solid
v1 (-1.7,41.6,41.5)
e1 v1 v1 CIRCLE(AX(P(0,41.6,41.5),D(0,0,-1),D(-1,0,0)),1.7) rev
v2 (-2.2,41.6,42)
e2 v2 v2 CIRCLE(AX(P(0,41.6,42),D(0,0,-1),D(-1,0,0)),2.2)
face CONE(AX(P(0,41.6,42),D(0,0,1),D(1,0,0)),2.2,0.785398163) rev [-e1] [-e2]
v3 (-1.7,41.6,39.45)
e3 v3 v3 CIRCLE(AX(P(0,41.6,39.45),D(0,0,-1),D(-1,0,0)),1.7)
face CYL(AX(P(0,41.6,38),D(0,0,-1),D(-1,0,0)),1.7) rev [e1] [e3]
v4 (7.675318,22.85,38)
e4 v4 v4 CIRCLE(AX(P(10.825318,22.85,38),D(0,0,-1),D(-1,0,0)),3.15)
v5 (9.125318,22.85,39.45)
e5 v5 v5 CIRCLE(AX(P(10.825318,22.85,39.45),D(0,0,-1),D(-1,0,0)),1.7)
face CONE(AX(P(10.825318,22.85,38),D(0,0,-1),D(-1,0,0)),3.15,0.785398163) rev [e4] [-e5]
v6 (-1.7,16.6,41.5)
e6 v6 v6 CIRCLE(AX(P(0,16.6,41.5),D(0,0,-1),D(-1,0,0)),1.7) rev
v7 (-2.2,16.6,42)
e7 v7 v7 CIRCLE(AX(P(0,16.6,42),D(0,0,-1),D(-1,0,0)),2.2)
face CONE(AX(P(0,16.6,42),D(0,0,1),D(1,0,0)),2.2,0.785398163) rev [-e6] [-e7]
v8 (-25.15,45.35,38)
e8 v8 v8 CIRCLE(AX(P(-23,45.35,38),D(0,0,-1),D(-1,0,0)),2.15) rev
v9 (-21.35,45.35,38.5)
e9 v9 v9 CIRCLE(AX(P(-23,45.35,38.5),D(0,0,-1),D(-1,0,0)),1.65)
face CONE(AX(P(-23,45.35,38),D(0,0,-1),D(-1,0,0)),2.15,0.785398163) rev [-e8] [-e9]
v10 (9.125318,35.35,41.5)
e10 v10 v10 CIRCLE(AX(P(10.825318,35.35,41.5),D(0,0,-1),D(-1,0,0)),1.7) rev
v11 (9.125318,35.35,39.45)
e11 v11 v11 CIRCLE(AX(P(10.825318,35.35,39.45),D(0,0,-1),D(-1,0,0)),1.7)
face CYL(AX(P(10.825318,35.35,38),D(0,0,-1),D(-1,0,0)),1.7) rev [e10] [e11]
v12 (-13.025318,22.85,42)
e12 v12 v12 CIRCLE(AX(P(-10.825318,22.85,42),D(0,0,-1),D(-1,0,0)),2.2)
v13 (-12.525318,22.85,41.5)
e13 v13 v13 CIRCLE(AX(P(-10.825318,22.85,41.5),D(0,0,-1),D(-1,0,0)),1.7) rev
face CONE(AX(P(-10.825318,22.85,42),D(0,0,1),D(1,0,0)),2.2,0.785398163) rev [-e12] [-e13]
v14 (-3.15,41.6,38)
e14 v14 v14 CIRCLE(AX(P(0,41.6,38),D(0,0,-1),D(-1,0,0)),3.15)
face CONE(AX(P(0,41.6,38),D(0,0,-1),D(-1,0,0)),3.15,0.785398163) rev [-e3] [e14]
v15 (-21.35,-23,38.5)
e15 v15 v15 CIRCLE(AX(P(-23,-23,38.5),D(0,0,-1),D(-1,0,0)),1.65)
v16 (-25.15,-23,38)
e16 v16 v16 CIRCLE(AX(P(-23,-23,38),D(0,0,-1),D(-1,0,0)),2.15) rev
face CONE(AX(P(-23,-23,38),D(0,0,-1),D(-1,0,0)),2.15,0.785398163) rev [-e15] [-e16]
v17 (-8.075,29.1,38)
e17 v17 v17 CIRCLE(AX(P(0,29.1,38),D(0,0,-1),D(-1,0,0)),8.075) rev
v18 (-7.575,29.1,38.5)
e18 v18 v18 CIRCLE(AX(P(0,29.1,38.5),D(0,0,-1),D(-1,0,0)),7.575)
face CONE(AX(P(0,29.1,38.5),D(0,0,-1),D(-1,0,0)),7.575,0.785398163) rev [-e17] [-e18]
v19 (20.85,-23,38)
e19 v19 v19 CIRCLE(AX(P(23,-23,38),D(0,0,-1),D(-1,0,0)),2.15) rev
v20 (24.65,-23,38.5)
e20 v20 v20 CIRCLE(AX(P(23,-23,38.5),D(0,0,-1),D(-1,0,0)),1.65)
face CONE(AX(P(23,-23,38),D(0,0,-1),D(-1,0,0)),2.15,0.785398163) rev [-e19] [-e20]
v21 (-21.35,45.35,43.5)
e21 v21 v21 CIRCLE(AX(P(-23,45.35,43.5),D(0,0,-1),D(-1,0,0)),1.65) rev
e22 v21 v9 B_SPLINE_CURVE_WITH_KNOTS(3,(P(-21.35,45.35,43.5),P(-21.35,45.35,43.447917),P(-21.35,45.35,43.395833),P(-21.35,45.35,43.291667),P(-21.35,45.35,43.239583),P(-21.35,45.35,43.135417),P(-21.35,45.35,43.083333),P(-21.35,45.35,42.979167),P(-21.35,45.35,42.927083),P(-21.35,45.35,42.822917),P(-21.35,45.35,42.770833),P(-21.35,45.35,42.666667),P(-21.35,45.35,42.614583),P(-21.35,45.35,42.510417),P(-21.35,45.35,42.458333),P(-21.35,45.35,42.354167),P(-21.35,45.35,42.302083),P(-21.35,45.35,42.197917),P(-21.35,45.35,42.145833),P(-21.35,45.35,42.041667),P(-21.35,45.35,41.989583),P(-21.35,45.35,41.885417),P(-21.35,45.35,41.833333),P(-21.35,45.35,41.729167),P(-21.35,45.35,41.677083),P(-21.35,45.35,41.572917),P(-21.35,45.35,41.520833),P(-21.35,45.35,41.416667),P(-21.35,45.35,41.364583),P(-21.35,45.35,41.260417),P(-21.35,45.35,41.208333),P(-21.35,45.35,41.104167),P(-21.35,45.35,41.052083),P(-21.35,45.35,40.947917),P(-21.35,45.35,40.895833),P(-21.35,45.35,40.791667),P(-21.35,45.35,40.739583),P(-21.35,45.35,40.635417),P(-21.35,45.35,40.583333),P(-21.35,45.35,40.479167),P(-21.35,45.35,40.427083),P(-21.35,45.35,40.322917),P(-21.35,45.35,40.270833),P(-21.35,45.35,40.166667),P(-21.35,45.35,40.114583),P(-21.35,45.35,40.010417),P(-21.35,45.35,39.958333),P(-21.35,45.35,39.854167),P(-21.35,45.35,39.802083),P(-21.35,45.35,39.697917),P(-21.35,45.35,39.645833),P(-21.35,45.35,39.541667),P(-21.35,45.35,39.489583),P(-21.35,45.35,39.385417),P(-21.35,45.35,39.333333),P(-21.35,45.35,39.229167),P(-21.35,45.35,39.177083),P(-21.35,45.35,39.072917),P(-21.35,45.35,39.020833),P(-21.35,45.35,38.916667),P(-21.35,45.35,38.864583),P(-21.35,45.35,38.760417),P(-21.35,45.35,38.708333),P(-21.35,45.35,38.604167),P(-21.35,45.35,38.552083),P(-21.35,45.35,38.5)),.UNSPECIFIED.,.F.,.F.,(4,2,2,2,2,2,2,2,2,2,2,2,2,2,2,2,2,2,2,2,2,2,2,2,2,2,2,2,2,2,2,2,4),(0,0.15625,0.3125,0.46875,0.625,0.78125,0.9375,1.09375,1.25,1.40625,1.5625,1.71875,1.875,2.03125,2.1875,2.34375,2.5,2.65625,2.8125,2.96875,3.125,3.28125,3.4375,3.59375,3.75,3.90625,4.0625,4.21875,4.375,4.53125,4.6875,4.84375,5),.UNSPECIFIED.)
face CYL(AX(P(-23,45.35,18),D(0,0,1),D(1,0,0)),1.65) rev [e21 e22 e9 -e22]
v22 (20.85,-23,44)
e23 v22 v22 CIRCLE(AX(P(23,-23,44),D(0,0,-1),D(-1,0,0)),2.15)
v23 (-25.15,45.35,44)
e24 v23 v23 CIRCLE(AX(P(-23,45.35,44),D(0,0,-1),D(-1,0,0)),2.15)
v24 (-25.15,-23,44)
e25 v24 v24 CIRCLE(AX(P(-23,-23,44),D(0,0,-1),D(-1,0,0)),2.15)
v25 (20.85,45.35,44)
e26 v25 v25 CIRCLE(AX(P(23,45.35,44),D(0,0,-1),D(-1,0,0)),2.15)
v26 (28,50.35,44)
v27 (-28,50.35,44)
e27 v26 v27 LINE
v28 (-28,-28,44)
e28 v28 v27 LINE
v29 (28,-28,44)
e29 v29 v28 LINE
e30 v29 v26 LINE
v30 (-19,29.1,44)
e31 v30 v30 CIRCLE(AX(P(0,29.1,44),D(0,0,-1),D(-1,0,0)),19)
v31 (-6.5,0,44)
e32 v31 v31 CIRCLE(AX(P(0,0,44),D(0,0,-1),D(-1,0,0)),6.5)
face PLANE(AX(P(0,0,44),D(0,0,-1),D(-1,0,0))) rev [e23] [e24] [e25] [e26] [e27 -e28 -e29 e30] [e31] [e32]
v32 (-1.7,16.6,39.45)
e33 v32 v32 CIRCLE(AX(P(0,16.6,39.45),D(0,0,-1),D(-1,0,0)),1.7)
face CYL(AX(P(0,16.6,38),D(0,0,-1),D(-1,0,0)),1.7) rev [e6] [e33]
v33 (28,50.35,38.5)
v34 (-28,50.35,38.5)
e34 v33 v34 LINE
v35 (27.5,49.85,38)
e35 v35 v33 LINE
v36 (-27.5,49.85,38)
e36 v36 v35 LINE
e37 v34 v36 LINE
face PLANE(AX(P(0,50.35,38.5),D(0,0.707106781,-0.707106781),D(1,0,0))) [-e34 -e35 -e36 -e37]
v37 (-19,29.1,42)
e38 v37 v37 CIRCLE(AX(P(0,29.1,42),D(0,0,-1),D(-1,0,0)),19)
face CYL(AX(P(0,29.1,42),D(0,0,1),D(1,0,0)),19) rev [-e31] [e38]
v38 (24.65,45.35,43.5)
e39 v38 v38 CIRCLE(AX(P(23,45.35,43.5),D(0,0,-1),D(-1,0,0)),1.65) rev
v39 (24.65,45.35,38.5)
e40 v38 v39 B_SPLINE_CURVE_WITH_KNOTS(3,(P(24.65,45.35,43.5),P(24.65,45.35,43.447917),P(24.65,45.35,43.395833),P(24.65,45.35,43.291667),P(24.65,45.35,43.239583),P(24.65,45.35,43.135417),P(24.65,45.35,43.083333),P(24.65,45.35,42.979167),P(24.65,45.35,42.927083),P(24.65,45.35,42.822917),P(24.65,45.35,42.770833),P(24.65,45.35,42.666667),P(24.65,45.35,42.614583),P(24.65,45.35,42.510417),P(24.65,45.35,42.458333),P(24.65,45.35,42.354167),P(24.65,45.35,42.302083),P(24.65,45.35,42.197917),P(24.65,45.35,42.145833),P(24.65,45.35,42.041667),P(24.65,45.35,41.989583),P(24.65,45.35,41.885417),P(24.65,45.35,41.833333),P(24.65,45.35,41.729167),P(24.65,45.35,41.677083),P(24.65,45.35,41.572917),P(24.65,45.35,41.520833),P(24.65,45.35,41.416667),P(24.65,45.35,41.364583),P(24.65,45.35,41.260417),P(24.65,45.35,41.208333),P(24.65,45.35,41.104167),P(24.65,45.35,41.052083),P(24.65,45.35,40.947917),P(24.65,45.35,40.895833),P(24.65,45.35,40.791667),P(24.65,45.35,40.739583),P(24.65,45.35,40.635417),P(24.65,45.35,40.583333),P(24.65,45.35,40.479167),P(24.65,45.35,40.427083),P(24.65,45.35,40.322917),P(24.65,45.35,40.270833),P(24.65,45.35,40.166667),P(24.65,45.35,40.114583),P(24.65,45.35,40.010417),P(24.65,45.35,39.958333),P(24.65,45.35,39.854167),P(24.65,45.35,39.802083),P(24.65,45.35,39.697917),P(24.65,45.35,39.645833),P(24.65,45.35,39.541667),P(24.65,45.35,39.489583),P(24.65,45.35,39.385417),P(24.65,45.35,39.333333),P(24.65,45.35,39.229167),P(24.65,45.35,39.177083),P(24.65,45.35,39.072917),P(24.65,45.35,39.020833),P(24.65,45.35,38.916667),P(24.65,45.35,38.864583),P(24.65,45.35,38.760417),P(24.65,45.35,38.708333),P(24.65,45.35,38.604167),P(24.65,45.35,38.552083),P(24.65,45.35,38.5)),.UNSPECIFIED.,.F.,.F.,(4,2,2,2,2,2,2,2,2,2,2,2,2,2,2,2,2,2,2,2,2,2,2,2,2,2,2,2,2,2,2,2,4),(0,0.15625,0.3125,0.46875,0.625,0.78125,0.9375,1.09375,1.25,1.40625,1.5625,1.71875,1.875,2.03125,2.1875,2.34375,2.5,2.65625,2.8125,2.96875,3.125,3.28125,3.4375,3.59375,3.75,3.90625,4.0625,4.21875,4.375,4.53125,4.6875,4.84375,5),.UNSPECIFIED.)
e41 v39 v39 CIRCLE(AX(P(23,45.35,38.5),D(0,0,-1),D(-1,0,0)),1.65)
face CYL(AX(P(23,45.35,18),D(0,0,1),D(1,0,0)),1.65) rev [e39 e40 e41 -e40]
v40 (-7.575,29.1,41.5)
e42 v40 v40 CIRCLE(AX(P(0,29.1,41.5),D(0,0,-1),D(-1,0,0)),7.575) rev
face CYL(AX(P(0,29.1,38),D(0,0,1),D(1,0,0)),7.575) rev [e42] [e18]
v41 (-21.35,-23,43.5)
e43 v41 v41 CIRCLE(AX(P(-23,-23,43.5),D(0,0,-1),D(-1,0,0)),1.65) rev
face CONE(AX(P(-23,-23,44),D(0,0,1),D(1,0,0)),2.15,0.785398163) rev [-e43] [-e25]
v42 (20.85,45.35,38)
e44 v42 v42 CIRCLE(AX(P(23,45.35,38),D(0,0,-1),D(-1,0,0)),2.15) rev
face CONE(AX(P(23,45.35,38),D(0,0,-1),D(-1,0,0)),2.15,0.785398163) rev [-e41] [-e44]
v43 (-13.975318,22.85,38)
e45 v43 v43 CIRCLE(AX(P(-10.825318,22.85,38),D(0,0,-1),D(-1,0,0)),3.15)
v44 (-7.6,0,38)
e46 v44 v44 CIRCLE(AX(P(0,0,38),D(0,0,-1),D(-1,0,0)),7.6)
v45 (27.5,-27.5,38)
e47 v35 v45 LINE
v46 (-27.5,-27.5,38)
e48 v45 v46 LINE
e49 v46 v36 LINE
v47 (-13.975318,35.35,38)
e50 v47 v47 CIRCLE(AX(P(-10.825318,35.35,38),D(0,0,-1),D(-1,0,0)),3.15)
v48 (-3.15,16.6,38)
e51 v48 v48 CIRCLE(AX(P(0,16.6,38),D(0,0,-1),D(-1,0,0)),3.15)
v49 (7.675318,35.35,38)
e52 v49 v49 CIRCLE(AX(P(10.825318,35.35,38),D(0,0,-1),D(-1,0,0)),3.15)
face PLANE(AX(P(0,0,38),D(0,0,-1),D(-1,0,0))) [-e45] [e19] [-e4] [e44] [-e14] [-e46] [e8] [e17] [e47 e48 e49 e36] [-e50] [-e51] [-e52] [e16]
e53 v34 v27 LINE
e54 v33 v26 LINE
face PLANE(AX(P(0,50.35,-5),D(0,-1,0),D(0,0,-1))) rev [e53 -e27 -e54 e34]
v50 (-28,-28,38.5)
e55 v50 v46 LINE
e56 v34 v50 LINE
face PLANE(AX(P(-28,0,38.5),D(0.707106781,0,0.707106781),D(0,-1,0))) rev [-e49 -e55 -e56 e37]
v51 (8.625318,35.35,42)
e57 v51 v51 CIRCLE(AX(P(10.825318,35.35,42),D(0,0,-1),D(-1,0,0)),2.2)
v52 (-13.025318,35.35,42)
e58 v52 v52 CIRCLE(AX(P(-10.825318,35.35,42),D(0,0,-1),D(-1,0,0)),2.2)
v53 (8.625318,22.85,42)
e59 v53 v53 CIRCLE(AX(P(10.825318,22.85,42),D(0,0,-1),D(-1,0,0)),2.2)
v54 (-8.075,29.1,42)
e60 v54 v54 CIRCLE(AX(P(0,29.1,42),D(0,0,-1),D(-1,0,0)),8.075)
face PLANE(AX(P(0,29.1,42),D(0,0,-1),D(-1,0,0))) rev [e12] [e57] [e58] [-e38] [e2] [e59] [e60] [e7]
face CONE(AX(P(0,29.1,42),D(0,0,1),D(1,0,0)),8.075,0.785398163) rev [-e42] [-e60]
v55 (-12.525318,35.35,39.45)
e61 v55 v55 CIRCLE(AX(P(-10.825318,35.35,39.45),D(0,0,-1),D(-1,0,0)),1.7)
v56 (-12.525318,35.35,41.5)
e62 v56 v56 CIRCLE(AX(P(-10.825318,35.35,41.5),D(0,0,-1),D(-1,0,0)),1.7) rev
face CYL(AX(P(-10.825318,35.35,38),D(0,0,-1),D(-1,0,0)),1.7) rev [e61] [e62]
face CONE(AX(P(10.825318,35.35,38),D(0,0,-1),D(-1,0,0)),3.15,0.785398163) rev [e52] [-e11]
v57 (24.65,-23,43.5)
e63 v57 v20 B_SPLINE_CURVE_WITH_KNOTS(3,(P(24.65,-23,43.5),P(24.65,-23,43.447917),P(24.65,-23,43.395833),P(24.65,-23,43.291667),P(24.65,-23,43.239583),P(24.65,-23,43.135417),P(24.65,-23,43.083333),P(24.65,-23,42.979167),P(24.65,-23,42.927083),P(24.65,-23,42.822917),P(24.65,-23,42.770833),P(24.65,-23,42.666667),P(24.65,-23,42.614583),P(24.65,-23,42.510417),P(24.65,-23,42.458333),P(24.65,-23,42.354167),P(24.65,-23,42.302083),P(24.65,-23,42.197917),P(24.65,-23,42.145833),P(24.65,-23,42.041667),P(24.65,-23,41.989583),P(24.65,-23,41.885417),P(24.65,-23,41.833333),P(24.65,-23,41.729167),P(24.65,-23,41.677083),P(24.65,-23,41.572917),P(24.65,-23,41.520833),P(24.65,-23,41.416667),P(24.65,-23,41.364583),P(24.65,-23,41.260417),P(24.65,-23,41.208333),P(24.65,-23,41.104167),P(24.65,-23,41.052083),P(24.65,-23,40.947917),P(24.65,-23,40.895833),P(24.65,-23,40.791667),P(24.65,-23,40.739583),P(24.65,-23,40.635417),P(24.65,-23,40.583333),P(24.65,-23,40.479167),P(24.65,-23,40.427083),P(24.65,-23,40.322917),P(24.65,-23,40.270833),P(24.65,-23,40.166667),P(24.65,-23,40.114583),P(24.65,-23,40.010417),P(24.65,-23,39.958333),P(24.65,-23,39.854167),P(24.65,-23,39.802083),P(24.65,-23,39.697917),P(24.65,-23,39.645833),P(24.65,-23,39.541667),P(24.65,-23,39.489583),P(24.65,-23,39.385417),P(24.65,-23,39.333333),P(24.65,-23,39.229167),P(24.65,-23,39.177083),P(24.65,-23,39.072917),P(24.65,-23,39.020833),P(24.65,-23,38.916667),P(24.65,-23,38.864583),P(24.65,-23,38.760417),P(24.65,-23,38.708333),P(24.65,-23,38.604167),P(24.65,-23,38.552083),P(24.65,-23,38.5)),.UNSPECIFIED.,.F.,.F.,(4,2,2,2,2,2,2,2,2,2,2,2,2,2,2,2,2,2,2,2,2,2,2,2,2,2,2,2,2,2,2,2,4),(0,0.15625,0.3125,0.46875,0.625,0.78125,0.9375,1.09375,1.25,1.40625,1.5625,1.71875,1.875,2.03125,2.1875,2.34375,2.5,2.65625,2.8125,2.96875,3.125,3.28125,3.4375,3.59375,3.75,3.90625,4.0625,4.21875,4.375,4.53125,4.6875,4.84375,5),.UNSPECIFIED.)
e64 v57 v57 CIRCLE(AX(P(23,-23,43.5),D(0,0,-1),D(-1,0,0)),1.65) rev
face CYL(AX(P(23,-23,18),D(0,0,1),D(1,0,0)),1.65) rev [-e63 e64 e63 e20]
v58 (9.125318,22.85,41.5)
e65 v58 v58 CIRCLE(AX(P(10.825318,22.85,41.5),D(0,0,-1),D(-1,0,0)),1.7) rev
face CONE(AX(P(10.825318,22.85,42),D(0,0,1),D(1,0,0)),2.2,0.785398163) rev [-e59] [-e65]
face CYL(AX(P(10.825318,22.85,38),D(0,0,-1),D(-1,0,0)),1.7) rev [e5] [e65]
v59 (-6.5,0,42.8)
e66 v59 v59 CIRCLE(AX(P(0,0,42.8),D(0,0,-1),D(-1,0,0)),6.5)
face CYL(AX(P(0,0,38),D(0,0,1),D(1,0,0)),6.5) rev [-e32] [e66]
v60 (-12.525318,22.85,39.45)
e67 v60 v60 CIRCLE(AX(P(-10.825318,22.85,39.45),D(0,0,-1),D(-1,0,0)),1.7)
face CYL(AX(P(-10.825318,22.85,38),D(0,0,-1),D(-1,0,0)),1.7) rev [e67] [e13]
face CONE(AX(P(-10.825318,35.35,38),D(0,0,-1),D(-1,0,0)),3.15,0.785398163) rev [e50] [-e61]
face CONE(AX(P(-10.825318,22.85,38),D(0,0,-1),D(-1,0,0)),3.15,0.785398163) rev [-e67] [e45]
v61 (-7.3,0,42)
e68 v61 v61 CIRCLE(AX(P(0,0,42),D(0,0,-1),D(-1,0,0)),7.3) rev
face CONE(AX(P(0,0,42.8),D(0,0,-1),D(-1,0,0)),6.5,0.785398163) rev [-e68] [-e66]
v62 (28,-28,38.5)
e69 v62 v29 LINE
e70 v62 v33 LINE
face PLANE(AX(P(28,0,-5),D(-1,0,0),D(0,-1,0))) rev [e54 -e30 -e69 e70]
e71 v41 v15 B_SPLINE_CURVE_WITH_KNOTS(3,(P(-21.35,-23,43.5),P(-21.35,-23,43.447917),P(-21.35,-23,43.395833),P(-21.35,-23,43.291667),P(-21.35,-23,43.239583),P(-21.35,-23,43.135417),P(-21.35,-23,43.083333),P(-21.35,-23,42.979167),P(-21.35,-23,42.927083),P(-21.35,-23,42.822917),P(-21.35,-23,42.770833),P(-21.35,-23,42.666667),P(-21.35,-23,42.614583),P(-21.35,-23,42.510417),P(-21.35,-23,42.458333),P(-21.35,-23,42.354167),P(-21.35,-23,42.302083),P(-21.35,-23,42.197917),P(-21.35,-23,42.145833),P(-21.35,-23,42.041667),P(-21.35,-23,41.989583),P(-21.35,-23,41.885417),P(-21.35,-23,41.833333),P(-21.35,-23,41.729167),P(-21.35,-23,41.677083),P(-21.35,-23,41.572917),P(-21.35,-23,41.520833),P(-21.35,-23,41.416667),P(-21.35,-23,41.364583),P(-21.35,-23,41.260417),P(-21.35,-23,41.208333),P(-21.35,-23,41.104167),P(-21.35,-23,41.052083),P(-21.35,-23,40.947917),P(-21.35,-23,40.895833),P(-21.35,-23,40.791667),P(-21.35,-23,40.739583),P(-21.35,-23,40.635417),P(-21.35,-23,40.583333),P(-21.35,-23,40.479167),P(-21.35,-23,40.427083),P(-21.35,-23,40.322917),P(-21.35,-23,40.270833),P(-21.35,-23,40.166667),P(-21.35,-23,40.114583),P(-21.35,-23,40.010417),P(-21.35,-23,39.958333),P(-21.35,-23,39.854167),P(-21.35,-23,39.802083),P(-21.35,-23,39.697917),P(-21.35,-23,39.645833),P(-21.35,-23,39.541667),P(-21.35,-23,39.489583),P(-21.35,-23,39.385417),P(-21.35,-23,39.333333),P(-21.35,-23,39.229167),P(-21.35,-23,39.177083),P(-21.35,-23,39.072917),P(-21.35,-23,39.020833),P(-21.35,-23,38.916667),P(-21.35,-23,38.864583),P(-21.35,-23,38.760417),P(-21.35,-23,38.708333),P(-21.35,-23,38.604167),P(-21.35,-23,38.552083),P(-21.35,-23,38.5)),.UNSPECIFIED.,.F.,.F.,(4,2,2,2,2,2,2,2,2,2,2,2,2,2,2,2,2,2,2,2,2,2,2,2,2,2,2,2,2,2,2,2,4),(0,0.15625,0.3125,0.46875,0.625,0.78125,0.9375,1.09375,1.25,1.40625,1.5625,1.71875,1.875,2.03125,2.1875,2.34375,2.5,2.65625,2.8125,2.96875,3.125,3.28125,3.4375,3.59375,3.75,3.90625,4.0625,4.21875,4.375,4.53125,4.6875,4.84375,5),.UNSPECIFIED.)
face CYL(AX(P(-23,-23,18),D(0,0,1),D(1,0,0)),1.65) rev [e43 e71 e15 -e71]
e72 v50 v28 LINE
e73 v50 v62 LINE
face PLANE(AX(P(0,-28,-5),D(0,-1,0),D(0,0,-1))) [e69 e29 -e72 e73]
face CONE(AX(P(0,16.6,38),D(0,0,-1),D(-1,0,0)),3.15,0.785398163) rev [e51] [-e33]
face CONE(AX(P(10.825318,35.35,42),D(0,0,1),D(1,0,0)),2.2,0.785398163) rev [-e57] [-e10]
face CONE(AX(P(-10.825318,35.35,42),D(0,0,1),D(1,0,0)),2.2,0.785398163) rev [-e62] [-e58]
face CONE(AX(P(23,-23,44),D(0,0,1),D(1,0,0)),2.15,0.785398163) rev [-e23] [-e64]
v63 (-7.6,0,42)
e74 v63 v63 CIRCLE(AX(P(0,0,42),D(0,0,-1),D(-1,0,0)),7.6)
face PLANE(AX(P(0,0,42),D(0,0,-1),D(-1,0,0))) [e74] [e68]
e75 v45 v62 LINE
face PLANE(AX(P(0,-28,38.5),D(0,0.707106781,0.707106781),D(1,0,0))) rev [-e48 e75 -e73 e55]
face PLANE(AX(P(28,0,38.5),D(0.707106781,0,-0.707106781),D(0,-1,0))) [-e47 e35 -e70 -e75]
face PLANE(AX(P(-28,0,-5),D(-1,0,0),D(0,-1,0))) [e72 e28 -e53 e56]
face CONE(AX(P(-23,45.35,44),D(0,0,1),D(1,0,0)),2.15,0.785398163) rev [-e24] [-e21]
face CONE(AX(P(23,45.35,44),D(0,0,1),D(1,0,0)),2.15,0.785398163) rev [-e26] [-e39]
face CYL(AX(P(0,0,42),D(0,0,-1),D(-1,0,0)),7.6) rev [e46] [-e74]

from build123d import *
from OCP.BRepFilletAPI import BRepFilletAPI_MakeChamfer

# Parameters (mm, degrees)
SKETCH1_W                                           = 56
SKETCH1_H                                           = 78.35
SKETCH1_R                                           = 6.5
SKETCH1_R_2                                         = 7.575
BOSS_EXTRUDE1_DEPTH                                 = 5
SKETCH1_4_W                                         = 56
SKETCH1_4_H                                         = 78.35
BOSS_EXTRUDE2_DEPTH                                 = 38
SKETCH4_W                                           = 2
SKETCH4_H                                           = 3
SKETCH7_W                                           = 4.75
SKETCH7_H                                           = 48
BOSS_EXTRUDE3_DEPTH                                 = 15.25
CHAMFER1_SIZE                                       = 17.35
CHAMFER1_SIZE_2                                     = 15.25
SKETCH9_W                                           = 2.7
SKETCH9_H                                           = 5.7
CUT_EXTRUDE11_DEPTH                                 = 8.5
CUT_EXTRUDE12_START                                 = 78.35
SKETCH9_3_W                                         = 2.7
SKETCH9_3_H                                         = 5.7
CUT_EXTRUDE12_DEPTH                                 = 8.5
SKETCH8_R                                           = 1.65
CUT_EXTRUDE5_DEPTH                                  = 175.5
BOSS_EXTRUDE4_START                                 = 38
SKETCH1_5_W                                         = 56
SKETCH1_5_H                                         = 78.35
BOSS_EXTRUDE4_DEPTH                                 = 6
CUT_EXTRUDE2_START                                  = -49
SKETCH2_R                                           = 1.65
CUT_EXTRUDE2_DEPTH                                  = 26
CUT_EXTRUDE6_START                                  = -49
CUT_EXTRUDE6_OUTLINE_R                              = 7.575
CUT_EXTRUDE6_OUTLINE_R_2                            = 6.5
CUT_EXTRUDE6_OUTLINE_R_3                            = 1.65
CUT_EXTRUDE6_DEPTH                                  = 6
CUT_EXTRUDE7_START                                  = -49
SKETCH10_3_R                                        = 19
CUT_EXTRUDE7_DEPTH                                  = 2
CUT_EXTRUDE8_START                                  = -43
SKETCH10_5_R                                        = 7.6
CUT_EXTRUDE8_DEPTH                                  = 4
CUT_EXTRUDE10_START                                 = -6
SKETCH11_2_W                                        = 56
SKETCH11_2_H                                        = 78.35
CUT_EXTRUDE10_DEPTH                                 = 58.25
CSK_FOR_M3_COUNTERSUNK_FLAT_HEAD_SCREW1_D           = 3.4
CSK_FOR_M3_COUNTERSUNK_FLAT_HEAD_SCREW1_DEPTH       = 47
CSK_FOR_M3_COUNTERSUNK_FLAT_HEAD_SCREW1_CSINK_D     = 6.3
CSK_FOR_M3_COUNTERSUNK_FLAT_HEAD_SCREW1_CSINK_ANGLE = 90
CSK_FOR_M3_COUNTERSUNK_FLAT_HEAD_SCREW1_TIP         = 1.021463052
CHAMFER4_SIZE                                       = 0.8
CHAMFER7_SIZE                                       = 0.5


# Read off the part's stored shape, not the designer's step: Cut-Extrude6
with BuildPart() as part:
    # Sketch1 → Boss-Extrude1 (new body)
    with BuildSketch(Plane.XY):
        with Locations((0, 11.175)):
            Rectangle(SKETCH1_W, SKETCH1_H)
        Circle(SKETCH1_R, mode=Mode.SUBTRACT)
        with Locations((0, 29.1)):
            Circle(SKETCH1_R_2, mode=Mode.SUBTRACT)
    extrude(amount=-BOSS_EXTRUDE1_DEPTH)

    # Sketch1<4> → Boss-Extrude2 (add)
    with BuildSketch(Plane.XY):
        with Locations((0, 11.175)):
            Rectangle(SKETCH1_4_W, SKETCH1_4_H)
        with BuildLine():
            ThreePointArc((-9.654082841, 21.972680412), (0, 41.1), (9.654082841, 21.972680412))
            ThreePointArc((9.654082841, 21.972680412), (0, -24), (-9.654082841, 21.972680412))
        make_face(mode=Mode.SUBTRACT)
    extrude(amount=BOSS_EXTRUDE2_DEPTH)

    # Cut-Sweep1: sweep along a path in Sketch3
    with BuildLine(Plane(origin=(0, 0, 38), x_dir=(-1, 0, 0), z_dir=(0, 0, -1))) as cut_sweep1_path:
        Line((26, 0), (26, 26.35))
        ThreePointArc((26, 26.35), (19.556349186, 41.906349186), (4, 48.35))
        Line((4, 48.35), (-4, 48.35))
        ThreePointArc((-4, 48.35), (-19.556349186, 41.906349186), (-26, 26.35))
        Line((-26, 26.35), (-26, -4))
        ThreePointArc((-26, -4), (-19.556349186, -19.556349186), (-4, -26))
        Line((-4, -26), (4, -26))
        ThreePointArc((4, -26), (19.556349186, -19.556349186), (26, -4))
        Line((26, -4), (26, 0))
    # Sketch4 → Cut-Sweep1 (sweep, cut)
    with BuildSketch(Plane(origin=(0, 0, 0), x_dir=(1, 0, 0), z_dir=(0, 1, 0))):
        with Locations((-26, -38.1)):
            Rectangle(SKETCH4_W, SKETCH4_H)
    sweep(path=cut_sweep1_path.line, mode=Mode.SUBTRACT)

    # Sketch7 → Boss-Extrude3 (add)
    with BuildSketch(Plane(origin=(0, 0, -5), x_dir=(-1, 0, 0), z_dir=(0, 0, -1))):
        with Locations((-25.625, 9)):
            Rectangle(SKETCH7_W, SKETCH7_H)
        with Locations((25.625, 9)):
            Rectangle(SKETCH7_W, SKETCH7_H)
    extrude(amount=BOSS_EXTRUDE3_DEPTH)

    # Chamfer1
    chamfer1_edges_1 = [part.edges().sort_by_distance(p)[0] for p in [
        (-25.625, 33, -5),
    ]]
    chamfer1_side_1 = [part.faces().sort_by_distance(p)[0] for p in [
        (-25.625, 33.305, -5),
    ]]
    chamfer1_edges_2 = [part.edges().sort_by_distance(p)[0] for p in [
        (25.625, 33, -5),
    ]]
    chamfer1_side_2 = [part.faces().sort_by_distance(p)[0] for p in [
        (25.625, 33.305, -5),
    ]]
    chamfer1 = BRepFilletAPI_MakeChamfer(part.part.solid().wrapped)
    for e in chamfer1_edges_1:
        chamfer1.Add(CHAMFER1_SIZE - 0.0001, CHAMFER1_SIZE_2 - 0.0001, e.wrapped, chamfer1_side_1[0].wrapped)
    for e in chamfer1_edges_2:
        chamfer1.Add(CHAMFER1_SIZE - 0.0001, CHAMFER1_SIZE_2 - 0.0001, e.wrapped, chamfer1_side_2[0].wrapped)
    add(Compound.cast(chamfer1.Shape()), mode=Mode.REPLACE)  # a hair under: the kernel refuses the full size

    # Sketch9 → Cut-Extrude11 (cut)
    with BuildSketch(Plane(origin=(-22.35, 50.35, 0), x_dir=(0, 0, -1), z_dir=(0, -1, 0))):
        with Locations((-33.65, -0.65)):
            Rectangle(SKETCH9_W, SKETCH9_H)
        with Locations((-33.65, 45.35)):
            Rectangle(SKETCH9_W, SKETCH9_H)
    extrude(amount=CUT_EXTRUDE11_DEPTH, mode=Mode.SUBTRACT)

    # Sketch9<3> → Cut-Extrude12 (cut)
    with BuildSketch(Plane(origin=(-22.35, 50.35, 0), x_dir=(0, 0, -1), z_dir=(0, -1, 0)).offset(CUT_EXTRUDE12_START)):
        with Locations((-33.65, -0.65)):
            Rectangle(SKETCH9_3_W, SKETCH9_3_H)
        with Locations((-33.65, 45.35)):
            Rectangle(SKETCH9_3_W, SKETCH9_3_H)
    extrude(amount=-CUT_EXTRUDE12_DEPTH, mode=Mode.SUBTRACT)

    # Sketch8 → Cut-Extrude5 (cut)
    with BuildSketch(Plane(origin=(28, 0, 0), x_dir=(0, 0, -1), z_dir=(1, 0, 0))):
        with Locations(Location((15.25, -9, 0), (0, 0, 270))):
            Circle(SKETCH8_R)
        with Locations(Location((15.25, 28, 0), (0, 0, 270))):
            Circle(SKETCH8_R)
    extrude(amount=-CUT_EXTRUDE5_DEPTH, mode=Mode.SUBTRACT)

    # Sketch1<5> → Boss-Extrude4 (add)
    with BuildSketch(Plane.XY.offset(BOSS_EXTRUDE4_START)):
        with Locations((0, 11.175)):
            Rectangle(SKETCH1_5_W, SKETCH1_5_H)
    extrude(amount=BOSS_EXTRUDE4_DEPTH)

    # Sketch2 → Cut-Extrude2 (cut)
    with BuildSketch(Plane(origin=(0, 0, -5), x_dir=(-1, 0, 0), z_dir=(0, 0, -1)).offset(CUT_EXTRUDE2_START)):
        with Locations(Location((-23, 45.35, 0), (0, 0, 180))):
            Circle(SKETCH2_R)
        with Locations(Location((23, 45.35, 0), (0, 0, 180))):
            Circle(SKETCH2_R)
        with Locations(Location((-23, -23, 0), (0, 0, 180))):
            Circle(SKETCH2_R)
        with Locations(Location((23, -23, 0), (0, 0, 180))):
            Circle(SKETCH2_R)
    extrude(amount=CUT_EXTRUDE2_DEPTH, mode=Mode.SUBTRACT)

    # Cut-Extrude6 outline → Cut-Extrude6 (cut)
    with BuildSketch(Plane(origin=(0, 0, -5), x_dir=(-1, 0, 0), z_dir=(0, 0, -1)).offset(CUT_EXTRUDE6_START)):
        with Locations((0, 29.1)):
            Circle(CUT_EXTRUDE6_OUTLINE_R)
        Circle(CUT_EXTRUDE6_OUTLINE_R_2)
        with Locations((-10.825317547, 35.35)):
            Circle(CUT_EXTRUDE6_OUTLINE_R_3)
        with Locations((-10.825317547, 22.85)):
            Circle(CUT_EXTRUDE6_OUTLINE_R_3)
        with Locations((0, 16.6)):
            Circle(CUT_EXTRUDE6_OUTLINE_R_3)
        with Locations((10.825317547, 22.85)):
            Circle(CUT_EXTRUDE6_OUTLINE_R_3)
        with Locations((10.825317547, 35.35)):
            Circle(CUT_EXTRUDE6_OUTLINE_R_3)
        with Locations((0, 41.6)):
            Circle(CUT_EXTRUDE6_OUTLINE_R_3)
    extrude(amount=CUT_EXTRUDE6_DEPTH, mode=Mode.SUBTRACT)

    # Sketch10<3> → Cut-Extrude7 (cut)
    with BuildSketch(Plane(origin=(0, 0, -5), x_dir=(-1, 0, 0), z_dir=(0, 0, -1)).offset(CUT_EXTRUDE7_START)):
        with Locations((0, 29.1)):
            Circle(SKETCH10_3_R)
    extrude(amount=CUT_EXTRUDE7_DEPTH, mode=Mode.SUBTRACT)

    # Sketch10<5> → Cut-Extrude8 (cut)
    with BuildSketch(Plane(origin=(0, 0, -5), x_dir=(-1, 0, 0), z_dir=(0, 0, -1)).offset(CUT_EXTRUDE8_START)):
        Circle(SKETCH10_5_R)
    extrude(amount=-CUT_EXTRUDE8_DEPTH, mode=Mode.SUBTRACT)

    # Sketch11<2> → Cut-Extrude10 (cut)
    with BuildSketch(Plane.XY.offset(44).offset(CUT_EXTRUDE10_START)):
        with Locations((0, 11.175)):
            Rectangle(SKETCH11_2_W, SKETCH11_2_H)
    extrude(amount=-CUT_EXTRUDE10_DEPTH, mode=Mode.SUBTRACT)

    # CSK for M3 Countersunk Flat Head Screw1
    with Locations(Plane(origin=(0, 0, 38), x_dir=(-1, 0, 0), z_dir=(0, 0, -1))):
        with Locations((-10.825317547, 35.35), (0, 41.6), (10.825317547, 35.35), (10.825317547, 22.85), (0, 16.6), (-10.825317547, 22.85)):
            CounterSinkHole(CSK_FOR_M3_COUNTERSUNK_FLAT_HEAD_SCREW1_D / 2, CSK_FOR_M3_COUNTERSUNK_FLAT_HEAD_SCREW1_CSINK_D / 2, depth=CSK_FOR_M3_COUNTERSUNK_FLAT_HEAD_SCREW1_DEPTH, counter_sink_angle=CSK_FOR_M3_COUNTERSUNK_FLAT_HEAD_SCREW1_CSINK_ANGLE)
            with Locations((0, 0, -(CSK_FOR_M3_COUNTERSUNK_FLAT_HEAD_SCREW1_DEPTH + CSK_FOR_M3_COUNTERSUNK_FLAT_HEAD_SCREW1_TIP / 2))):  # 118° drill point
                Cone(0, CSK_FOR_M3_COUNTERSUNK_FLAT_HEAD_SCREW1_D / 2, CSK_FOR_M3_COUNTERSUNK_FLAT_HEAD_SCREW1_TIP, mode=Mode.SUBTRACT)

    # Chamfer4
    chamfer4_edges = [part.edges().sort_by_distance(p)[0] for p in [
        (6.5, 0, 42),
    ]]
    chamfer(chamfer4_edges, length=CHAMFER4_SIZE)

    # Chamfer7
    chamfer7_edges = [part.edges().sort_by_distance(p)[0] for p in [
        (-24.65, 45.35, 44),
        (21.35, -23, 44),
        (-24.65, -23, 44),
        (21.35, 45.35, 44),
        (7.575, 29.1, 38),
        (7.575, 29.1, 42),
        (21.35, 45.35, 38),
        (-24.65, -23, 38),
        (21.35, -23, 38),
        (-24.65, 45.35, 38),
        (-28, 11.175, 38),
        (0, -28, 38),
        (28, 11.175, 38),
        (0, 50.35, 38),
        (9.125317547, 22.85, 42),
        (-1.7, 16.6, 42),
        (-12.525317547, 22.85, 42),
        (-12.525317547, 35.35, 42),
        (-1.7, 41.6, 42),
        (9.125317547, 35.35, 42),
    ]]
    chamfer(chamfer7_edges, length=CHAMFER7_SIZE)


solid = part.part
